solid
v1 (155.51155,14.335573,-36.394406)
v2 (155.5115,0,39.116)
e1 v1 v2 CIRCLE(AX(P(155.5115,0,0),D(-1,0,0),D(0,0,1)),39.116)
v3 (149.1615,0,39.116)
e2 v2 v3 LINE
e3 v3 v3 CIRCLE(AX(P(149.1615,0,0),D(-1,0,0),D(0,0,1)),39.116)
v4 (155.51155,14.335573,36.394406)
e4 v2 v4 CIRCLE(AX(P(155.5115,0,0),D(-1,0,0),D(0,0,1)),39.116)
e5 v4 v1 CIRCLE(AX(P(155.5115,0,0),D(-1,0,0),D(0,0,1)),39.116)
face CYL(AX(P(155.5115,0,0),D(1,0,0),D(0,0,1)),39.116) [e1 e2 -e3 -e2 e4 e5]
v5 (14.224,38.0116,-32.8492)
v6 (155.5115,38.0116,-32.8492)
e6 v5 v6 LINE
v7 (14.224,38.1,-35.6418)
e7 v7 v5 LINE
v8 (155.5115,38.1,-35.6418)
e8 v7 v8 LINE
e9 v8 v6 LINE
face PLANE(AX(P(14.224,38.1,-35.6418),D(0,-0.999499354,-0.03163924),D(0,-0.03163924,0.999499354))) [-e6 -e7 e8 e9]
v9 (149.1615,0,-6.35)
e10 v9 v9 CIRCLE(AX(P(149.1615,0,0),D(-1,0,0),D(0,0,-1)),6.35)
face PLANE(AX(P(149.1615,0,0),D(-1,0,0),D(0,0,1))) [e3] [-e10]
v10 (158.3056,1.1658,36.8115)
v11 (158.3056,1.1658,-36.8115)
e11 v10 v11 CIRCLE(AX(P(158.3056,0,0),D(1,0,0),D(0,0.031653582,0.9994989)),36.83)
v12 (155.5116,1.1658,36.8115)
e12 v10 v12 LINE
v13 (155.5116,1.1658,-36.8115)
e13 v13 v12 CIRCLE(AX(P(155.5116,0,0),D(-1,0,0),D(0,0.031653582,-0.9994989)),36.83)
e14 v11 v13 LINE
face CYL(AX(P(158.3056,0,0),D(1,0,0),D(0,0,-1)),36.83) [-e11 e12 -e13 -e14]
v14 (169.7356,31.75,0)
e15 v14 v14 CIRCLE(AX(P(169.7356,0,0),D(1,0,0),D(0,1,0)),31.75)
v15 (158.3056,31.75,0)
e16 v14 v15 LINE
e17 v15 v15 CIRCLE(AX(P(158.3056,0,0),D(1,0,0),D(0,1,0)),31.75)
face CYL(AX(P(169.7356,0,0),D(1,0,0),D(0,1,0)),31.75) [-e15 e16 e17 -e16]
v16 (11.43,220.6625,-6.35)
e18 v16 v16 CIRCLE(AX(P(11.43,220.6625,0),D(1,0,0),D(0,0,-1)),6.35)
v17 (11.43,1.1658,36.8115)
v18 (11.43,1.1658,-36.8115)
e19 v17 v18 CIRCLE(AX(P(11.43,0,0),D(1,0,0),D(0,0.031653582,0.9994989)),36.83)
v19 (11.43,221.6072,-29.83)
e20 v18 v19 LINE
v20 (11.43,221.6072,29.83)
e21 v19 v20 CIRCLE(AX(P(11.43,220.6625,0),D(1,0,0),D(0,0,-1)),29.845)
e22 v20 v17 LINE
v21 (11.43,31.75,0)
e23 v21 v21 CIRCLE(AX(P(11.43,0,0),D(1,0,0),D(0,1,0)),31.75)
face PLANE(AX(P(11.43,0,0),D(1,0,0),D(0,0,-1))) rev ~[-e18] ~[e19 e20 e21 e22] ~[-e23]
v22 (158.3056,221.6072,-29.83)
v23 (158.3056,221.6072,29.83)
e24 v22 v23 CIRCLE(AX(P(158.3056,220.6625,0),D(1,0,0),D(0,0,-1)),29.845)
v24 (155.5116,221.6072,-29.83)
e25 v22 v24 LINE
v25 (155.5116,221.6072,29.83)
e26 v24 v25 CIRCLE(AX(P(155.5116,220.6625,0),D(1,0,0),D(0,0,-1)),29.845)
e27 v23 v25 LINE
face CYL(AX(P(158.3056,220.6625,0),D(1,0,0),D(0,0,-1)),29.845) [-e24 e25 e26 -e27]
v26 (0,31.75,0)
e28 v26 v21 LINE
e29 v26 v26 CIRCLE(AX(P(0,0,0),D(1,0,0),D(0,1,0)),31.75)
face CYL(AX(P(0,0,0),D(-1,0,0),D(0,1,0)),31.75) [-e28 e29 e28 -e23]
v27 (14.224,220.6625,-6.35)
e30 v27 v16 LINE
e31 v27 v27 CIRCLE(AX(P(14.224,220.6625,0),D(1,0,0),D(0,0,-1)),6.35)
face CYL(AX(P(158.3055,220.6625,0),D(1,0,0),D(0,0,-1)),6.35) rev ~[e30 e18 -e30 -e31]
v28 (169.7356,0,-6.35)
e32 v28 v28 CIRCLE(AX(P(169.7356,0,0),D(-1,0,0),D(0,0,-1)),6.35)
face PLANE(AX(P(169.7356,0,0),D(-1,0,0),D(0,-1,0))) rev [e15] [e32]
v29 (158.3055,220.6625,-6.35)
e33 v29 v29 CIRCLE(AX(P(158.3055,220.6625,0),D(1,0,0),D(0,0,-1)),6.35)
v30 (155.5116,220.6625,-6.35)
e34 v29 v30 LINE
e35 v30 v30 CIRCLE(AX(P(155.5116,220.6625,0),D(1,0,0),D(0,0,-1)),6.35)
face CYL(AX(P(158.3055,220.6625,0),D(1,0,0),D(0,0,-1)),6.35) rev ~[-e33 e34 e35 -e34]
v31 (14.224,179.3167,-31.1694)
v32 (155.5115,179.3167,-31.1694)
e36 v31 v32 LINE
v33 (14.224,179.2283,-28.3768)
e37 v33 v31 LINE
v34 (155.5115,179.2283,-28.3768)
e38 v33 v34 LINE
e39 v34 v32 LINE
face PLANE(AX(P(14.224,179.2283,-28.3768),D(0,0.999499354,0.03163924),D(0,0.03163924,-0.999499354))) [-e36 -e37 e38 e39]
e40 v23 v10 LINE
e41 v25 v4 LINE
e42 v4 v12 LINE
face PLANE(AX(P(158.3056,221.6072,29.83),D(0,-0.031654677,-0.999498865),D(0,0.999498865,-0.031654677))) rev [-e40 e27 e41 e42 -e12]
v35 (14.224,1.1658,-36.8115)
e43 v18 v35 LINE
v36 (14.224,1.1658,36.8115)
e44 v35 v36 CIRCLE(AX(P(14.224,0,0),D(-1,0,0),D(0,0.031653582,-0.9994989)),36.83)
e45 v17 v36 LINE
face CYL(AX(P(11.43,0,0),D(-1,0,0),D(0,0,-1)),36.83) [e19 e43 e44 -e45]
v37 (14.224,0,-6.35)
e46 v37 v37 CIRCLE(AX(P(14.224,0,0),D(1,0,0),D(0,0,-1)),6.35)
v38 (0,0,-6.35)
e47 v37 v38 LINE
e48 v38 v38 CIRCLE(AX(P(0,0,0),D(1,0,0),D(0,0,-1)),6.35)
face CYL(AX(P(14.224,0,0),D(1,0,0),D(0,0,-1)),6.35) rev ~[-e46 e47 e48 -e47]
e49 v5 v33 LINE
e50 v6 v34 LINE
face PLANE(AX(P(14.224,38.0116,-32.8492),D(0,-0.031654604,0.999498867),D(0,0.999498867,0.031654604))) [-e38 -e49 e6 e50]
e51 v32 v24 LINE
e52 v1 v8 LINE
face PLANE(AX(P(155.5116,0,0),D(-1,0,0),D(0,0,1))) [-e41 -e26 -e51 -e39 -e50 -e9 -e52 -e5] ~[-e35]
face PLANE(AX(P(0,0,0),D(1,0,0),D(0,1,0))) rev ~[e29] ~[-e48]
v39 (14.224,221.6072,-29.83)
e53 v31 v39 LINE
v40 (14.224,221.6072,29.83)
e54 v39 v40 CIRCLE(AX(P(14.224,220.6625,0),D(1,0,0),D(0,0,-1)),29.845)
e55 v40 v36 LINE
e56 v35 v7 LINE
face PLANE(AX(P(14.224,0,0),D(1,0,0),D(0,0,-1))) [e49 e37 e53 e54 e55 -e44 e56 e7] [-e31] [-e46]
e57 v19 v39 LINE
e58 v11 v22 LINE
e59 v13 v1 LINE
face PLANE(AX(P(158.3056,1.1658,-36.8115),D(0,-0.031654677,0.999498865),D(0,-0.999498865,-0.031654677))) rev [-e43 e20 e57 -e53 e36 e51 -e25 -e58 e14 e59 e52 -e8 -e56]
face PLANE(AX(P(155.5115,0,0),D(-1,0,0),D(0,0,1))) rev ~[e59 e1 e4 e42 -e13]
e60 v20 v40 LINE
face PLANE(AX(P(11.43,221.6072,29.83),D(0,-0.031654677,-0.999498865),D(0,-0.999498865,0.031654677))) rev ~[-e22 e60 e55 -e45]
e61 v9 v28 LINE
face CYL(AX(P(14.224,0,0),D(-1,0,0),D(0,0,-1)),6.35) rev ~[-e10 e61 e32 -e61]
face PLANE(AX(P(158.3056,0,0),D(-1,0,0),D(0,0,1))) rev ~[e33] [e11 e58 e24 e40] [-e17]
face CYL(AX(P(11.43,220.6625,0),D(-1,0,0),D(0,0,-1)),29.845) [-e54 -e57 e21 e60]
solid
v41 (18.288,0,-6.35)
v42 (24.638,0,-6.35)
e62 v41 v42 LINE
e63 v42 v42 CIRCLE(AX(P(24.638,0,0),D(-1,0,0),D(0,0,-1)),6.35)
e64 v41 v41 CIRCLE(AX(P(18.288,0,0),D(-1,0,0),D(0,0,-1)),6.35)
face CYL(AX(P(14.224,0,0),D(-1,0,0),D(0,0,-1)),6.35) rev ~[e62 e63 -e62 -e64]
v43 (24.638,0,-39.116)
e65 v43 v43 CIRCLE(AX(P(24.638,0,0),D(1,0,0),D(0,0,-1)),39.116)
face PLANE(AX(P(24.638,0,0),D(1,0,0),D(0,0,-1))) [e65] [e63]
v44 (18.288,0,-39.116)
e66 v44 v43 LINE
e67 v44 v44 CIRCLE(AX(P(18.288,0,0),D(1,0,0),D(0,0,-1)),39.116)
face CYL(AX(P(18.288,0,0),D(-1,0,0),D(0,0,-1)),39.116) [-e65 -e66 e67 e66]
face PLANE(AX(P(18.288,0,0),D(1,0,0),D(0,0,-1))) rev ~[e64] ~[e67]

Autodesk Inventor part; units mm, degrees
sketch "Sketch1" plane through (0, 0, 0) normal (1, 0, 0) x (0, 1, 0)
  circle A0 centre (0, 0) radius 31.75
  dimension "d0" = 63.5
extrude "Extrusion1" add sketch "Sketch1" along normal blind 11.43
sketch "Sketch2" plane through (11.43, 0, 0) normal (1, 0, 0) x (0, 0, -1)
  circle A0 centre (0, 0) radius 36.83
  circle A1 centre (0, 0) radius 31.75 projected
  circle A2 centre (0, 220.6625) radius 29.845
  line L0 (-29.83, 221.6072) -> (-36.8115, 1.1658)
  line L1 (36.8115, 1.1658) -> (29.83, 221.6072)
  line L2 (0, 220.6625) -> (0, 0) construction
  dimension "d3" = 5.08
  dimension "d4" = 59.69
  dimension "d5" = 220.6625
extrude "Extrusion2" add sketch "Sketch2" along normal blind 2.794 contours A0 | A0 L0 A2 L1 | A2 | A1
ref_plane "Work Plane1" through (18.288, 0, 0) normal (1, 0, 0) x (0, 0, -1)
sketch "Sketch4" plane through (18.288, 0, 0) normal (1, 0, 0) x (0, 0, -1)
  circle A0 centre (0, 0) radius 39.116
  dimension "d12" = 78.232
extrude "Extrusion4" add sketch "Sketch4" along normal blind 6.35
ref_plane "Work Plane2" through (155.5115, 0, 0) normal (1, 0, 0) x (0, 0, -1)
sketch "Sketch5" plane through (14.224, 0, 0) normal (1, 0, 0) x (0, 0, -1)
  line L0 (36.8115, 1.1658) -> (29.83, 221.6072) projected
  line L1 (35.6418, 38.1) -> (32.8492, 38.0116)
  line L2 (32.8492, 38.0116) -> (28.3768, 179.2283)
  line L3 (28.3768, 179.2283) -> (31.1694, 179.3167)
  point P0 (0, 0)
  dimension "d16" = 2.794
  dimension "d17" = 141.2875
  dimension "d18" = 38.1
extrude "Extrusion5" add sketch "Sketch5" along normal up to surface (141.2875 mm away)
ref_plane "Work Plane3" through (84.8678, 0, 0) normal (1, 0, 0) x (0, 0, -1)
mirror "Mirror1" about plane through (84.8678, 0, 0) normal (1, 0, 0) of "Extrusion2", "Extrusion1"
sketch "Sketch6" plane through (155.5115, 0, 0) normal (-1, 0, 0) x (0, 0, 1)
  circle A0 centre (0, 0) radius 39.116 projected
extrude "Extrusion6" add sketch "Sketch6" along normal blind 6.35
sketch "Sketch3" plane through (14.224, 0, 0) normal (1, 0, 0) x (0, 0, -1)
  circle A0 centre (0, 0) radius 6.35
  dimension "d8" = 12.7
extrude "Extrusion3" cut sketch "Sketch3" along normal through all both and the other way through all
sketch "Sketch7" plane through (158.3055, 0, 0) normal (1, 0, 0) x (0, 0, -1)
  arc A0 (29.83, 221.6072) -> (-29.83, 221.6072) centre (0, 220.6625) ccw projected
  circle A1 centre (0, 220.6625) radius 6.35
  point P0 (0, 0)
  dimension "d24" = 12.7
extrude "Extrusion7" cut sketch "Sketch7" against normal through all
properties part number "2nd_Arm" material "Aluminum 6061"
